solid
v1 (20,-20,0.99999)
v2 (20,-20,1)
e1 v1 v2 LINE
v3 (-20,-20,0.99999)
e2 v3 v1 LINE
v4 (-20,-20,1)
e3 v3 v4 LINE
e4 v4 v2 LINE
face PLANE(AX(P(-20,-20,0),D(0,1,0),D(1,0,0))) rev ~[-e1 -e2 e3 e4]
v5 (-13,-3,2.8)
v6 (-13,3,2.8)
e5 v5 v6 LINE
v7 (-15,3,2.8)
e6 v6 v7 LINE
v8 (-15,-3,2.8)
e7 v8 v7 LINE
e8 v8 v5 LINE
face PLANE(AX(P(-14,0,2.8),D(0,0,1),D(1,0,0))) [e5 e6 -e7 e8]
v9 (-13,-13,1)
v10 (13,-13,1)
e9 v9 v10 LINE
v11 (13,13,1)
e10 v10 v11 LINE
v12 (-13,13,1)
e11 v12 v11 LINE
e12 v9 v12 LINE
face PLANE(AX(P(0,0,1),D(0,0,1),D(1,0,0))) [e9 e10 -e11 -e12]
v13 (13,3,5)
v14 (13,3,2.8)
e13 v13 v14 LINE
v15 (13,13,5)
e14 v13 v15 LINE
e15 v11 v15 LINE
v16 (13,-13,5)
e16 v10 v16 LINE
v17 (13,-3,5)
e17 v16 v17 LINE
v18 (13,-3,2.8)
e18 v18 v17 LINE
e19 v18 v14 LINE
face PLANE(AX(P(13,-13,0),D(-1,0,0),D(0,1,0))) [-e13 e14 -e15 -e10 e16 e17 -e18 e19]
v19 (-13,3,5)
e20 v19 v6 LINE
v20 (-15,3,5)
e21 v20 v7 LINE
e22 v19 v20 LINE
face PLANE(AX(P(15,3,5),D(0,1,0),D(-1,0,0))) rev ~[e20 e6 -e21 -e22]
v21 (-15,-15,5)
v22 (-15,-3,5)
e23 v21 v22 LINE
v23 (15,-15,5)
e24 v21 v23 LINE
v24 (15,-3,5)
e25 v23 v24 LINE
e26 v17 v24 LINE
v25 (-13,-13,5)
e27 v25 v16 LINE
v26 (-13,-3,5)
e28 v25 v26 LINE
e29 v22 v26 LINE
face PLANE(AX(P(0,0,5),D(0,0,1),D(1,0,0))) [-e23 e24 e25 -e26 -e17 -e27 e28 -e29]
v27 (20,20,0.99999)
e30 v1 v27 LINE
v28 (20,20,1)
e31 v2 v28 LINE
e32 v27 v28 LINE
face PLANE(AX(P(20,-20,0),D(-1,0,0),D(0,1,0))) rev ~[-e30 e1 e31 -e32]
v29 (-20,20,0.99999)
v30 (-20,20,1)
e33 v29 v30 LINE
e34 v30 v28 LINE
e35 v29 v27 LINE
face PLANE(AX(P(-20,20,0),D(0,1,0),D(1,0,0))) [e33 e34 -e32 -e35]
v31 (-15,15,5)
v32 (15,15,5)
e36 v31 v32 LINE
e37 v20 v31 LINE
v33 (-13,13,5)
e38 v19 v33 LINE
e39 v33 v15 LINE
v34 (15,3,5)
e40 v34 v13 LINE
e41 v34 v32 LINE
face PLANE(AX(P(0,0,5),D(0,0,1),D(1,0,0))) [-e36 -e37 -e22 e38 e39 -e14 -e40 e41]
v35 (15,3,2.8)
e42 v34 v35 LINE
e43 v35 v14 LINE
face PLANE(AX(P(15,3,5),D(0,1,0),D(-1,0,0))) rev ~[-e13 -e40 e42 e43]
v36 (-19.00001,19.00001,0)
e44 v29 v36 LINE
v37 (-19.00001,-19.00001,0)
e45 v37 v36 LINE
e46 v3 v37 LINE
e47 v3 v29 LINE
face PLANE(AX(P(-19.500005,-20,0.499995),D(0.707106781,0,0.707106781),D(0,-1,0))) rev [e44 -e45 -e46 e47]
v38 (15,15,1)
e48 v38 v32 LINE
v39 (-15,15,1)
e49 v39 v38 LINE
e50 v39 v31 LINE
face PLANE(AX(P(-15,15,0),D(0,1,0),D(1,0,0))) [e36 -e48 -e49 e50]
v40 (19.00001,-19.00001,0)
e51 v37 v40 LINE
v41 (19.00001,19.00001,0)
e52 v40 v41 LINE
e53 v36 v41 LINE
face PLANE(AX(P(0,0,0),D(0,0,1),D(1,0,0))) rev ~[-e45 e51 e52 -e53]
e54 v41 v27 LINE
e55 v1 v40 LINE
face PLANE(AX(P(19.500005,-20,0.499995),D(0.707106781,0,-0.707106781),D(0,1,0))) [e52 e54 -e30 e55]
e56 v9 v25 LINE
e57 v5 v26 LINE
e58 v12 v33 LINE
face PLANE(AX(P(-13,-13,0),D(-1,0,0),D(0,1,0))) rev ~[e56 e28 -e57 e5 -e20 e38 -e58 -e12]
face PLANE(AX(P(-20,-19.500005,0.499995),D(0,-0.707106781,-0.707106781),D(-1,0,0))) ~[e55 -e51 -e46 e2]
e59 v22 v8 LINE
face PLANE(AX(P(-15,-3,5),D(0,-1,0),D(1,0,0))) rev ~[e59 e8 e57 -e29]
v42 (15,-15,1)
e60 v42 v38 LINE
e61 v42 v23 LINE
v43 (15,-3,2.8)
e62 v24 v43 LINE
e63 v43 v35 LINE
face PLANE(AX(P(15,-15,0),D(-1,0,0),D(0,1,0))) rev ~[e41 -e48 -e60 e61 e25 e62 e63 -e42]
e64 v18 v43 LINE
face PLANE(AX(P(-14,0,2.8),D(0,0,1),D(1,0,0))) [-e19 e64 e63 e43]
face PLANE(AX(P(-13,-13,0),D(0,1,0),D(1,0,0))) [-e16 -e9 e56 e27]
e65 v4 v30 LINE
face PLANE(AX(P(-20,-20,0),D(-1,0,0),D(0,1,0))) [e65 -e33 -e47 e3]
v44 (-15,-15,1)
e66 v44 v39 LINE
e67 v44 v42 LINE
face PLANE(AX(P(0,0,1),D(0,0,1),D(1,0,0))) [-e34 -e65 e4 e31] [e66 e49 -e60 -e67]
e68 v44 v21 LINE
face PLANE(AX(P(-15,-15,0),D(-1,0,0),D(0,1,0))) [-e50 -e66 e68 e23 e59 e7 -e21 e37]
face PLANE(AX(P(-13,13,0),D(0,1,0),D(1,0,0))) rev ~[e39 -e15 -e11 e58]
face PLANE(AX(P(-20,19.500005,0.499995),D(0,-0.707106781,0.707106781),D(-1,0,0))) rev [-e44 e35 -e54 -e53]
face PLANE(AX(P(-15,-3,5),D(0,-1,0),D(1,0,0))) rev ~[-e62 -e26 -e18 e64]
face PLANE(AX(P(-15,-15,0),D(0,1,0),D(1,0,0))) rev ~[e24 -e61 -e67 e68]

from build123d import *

# Parameters (mm, degrees)
F0_W     = 30
F0_H     = 30
F0_W_2   = 26
F0_H_2   = 26
F1_DEPTH = 5
F0_W_3   = 39.9999991059
F0_H_3   = 39.9999991059
F2_DEPTH = 1
F3_W     = 2
F3_H     = 6
F3_W_2   = 26
F4_DEPTH = 2.2
F6_SIZE  = 0.99999


# Not quite as in the source:
# - a fillet or chamfer is up to 0.001 mm smaller than in the source, because OpenCascade refuses the exact size
# - a feature of the source that left no trace in its solid (it failed there, or was rolled back) is left out


with BuildPart() as f1:
    # F0 (on Top) → F1 (new body)
    with BuildSketch(Plane.XY):
        Rectangle(F0_W, F0_H)
        Rectangle(F0_W_2, F0_H_2, mode=Mode.SUBTRACT)
    extrude(amount=F1_DEPTH)

    # F0 (on Top) → F2 (join)
    with BuildSketch(Plane.XY):
        Rectangle(F0_W_3, F0_H_3)
        Rectangle(F0_W, F0_H, mode=Mode.SUBTRACT)
        Rectangle(F0_W_2, F0_H_2)
    extrude(amount=F2_DEPTH)

    # F3 (on face) → F4 (cut)
    with BuildSketch(Plane.XY.offset(5)):
        with Locations((-14, 0)):
            Rectangle(F3_W, F3_H)
        Rectangle(F3_W_2, F3_H)
        with Locations((14, 0)):
            Rectangle(F3_W, F3_H)
    extrude(amount=-F4_DEPTH, mode=Mode.SUBTRACT)

    # F6 (size 1 in the source; OpenCascade refuses exactly that, so slightly less here)
    f6_edges = [f1.edges().sort_by_distance(p)[0] for p in [
        (-20, 0, 0),
        (0, -20, 0),
        (20, 0, 0),
        (0, 20, 0),
    ]]
    chamfer(f6_edges, length=F6_SIZE)


solid = f1.part
